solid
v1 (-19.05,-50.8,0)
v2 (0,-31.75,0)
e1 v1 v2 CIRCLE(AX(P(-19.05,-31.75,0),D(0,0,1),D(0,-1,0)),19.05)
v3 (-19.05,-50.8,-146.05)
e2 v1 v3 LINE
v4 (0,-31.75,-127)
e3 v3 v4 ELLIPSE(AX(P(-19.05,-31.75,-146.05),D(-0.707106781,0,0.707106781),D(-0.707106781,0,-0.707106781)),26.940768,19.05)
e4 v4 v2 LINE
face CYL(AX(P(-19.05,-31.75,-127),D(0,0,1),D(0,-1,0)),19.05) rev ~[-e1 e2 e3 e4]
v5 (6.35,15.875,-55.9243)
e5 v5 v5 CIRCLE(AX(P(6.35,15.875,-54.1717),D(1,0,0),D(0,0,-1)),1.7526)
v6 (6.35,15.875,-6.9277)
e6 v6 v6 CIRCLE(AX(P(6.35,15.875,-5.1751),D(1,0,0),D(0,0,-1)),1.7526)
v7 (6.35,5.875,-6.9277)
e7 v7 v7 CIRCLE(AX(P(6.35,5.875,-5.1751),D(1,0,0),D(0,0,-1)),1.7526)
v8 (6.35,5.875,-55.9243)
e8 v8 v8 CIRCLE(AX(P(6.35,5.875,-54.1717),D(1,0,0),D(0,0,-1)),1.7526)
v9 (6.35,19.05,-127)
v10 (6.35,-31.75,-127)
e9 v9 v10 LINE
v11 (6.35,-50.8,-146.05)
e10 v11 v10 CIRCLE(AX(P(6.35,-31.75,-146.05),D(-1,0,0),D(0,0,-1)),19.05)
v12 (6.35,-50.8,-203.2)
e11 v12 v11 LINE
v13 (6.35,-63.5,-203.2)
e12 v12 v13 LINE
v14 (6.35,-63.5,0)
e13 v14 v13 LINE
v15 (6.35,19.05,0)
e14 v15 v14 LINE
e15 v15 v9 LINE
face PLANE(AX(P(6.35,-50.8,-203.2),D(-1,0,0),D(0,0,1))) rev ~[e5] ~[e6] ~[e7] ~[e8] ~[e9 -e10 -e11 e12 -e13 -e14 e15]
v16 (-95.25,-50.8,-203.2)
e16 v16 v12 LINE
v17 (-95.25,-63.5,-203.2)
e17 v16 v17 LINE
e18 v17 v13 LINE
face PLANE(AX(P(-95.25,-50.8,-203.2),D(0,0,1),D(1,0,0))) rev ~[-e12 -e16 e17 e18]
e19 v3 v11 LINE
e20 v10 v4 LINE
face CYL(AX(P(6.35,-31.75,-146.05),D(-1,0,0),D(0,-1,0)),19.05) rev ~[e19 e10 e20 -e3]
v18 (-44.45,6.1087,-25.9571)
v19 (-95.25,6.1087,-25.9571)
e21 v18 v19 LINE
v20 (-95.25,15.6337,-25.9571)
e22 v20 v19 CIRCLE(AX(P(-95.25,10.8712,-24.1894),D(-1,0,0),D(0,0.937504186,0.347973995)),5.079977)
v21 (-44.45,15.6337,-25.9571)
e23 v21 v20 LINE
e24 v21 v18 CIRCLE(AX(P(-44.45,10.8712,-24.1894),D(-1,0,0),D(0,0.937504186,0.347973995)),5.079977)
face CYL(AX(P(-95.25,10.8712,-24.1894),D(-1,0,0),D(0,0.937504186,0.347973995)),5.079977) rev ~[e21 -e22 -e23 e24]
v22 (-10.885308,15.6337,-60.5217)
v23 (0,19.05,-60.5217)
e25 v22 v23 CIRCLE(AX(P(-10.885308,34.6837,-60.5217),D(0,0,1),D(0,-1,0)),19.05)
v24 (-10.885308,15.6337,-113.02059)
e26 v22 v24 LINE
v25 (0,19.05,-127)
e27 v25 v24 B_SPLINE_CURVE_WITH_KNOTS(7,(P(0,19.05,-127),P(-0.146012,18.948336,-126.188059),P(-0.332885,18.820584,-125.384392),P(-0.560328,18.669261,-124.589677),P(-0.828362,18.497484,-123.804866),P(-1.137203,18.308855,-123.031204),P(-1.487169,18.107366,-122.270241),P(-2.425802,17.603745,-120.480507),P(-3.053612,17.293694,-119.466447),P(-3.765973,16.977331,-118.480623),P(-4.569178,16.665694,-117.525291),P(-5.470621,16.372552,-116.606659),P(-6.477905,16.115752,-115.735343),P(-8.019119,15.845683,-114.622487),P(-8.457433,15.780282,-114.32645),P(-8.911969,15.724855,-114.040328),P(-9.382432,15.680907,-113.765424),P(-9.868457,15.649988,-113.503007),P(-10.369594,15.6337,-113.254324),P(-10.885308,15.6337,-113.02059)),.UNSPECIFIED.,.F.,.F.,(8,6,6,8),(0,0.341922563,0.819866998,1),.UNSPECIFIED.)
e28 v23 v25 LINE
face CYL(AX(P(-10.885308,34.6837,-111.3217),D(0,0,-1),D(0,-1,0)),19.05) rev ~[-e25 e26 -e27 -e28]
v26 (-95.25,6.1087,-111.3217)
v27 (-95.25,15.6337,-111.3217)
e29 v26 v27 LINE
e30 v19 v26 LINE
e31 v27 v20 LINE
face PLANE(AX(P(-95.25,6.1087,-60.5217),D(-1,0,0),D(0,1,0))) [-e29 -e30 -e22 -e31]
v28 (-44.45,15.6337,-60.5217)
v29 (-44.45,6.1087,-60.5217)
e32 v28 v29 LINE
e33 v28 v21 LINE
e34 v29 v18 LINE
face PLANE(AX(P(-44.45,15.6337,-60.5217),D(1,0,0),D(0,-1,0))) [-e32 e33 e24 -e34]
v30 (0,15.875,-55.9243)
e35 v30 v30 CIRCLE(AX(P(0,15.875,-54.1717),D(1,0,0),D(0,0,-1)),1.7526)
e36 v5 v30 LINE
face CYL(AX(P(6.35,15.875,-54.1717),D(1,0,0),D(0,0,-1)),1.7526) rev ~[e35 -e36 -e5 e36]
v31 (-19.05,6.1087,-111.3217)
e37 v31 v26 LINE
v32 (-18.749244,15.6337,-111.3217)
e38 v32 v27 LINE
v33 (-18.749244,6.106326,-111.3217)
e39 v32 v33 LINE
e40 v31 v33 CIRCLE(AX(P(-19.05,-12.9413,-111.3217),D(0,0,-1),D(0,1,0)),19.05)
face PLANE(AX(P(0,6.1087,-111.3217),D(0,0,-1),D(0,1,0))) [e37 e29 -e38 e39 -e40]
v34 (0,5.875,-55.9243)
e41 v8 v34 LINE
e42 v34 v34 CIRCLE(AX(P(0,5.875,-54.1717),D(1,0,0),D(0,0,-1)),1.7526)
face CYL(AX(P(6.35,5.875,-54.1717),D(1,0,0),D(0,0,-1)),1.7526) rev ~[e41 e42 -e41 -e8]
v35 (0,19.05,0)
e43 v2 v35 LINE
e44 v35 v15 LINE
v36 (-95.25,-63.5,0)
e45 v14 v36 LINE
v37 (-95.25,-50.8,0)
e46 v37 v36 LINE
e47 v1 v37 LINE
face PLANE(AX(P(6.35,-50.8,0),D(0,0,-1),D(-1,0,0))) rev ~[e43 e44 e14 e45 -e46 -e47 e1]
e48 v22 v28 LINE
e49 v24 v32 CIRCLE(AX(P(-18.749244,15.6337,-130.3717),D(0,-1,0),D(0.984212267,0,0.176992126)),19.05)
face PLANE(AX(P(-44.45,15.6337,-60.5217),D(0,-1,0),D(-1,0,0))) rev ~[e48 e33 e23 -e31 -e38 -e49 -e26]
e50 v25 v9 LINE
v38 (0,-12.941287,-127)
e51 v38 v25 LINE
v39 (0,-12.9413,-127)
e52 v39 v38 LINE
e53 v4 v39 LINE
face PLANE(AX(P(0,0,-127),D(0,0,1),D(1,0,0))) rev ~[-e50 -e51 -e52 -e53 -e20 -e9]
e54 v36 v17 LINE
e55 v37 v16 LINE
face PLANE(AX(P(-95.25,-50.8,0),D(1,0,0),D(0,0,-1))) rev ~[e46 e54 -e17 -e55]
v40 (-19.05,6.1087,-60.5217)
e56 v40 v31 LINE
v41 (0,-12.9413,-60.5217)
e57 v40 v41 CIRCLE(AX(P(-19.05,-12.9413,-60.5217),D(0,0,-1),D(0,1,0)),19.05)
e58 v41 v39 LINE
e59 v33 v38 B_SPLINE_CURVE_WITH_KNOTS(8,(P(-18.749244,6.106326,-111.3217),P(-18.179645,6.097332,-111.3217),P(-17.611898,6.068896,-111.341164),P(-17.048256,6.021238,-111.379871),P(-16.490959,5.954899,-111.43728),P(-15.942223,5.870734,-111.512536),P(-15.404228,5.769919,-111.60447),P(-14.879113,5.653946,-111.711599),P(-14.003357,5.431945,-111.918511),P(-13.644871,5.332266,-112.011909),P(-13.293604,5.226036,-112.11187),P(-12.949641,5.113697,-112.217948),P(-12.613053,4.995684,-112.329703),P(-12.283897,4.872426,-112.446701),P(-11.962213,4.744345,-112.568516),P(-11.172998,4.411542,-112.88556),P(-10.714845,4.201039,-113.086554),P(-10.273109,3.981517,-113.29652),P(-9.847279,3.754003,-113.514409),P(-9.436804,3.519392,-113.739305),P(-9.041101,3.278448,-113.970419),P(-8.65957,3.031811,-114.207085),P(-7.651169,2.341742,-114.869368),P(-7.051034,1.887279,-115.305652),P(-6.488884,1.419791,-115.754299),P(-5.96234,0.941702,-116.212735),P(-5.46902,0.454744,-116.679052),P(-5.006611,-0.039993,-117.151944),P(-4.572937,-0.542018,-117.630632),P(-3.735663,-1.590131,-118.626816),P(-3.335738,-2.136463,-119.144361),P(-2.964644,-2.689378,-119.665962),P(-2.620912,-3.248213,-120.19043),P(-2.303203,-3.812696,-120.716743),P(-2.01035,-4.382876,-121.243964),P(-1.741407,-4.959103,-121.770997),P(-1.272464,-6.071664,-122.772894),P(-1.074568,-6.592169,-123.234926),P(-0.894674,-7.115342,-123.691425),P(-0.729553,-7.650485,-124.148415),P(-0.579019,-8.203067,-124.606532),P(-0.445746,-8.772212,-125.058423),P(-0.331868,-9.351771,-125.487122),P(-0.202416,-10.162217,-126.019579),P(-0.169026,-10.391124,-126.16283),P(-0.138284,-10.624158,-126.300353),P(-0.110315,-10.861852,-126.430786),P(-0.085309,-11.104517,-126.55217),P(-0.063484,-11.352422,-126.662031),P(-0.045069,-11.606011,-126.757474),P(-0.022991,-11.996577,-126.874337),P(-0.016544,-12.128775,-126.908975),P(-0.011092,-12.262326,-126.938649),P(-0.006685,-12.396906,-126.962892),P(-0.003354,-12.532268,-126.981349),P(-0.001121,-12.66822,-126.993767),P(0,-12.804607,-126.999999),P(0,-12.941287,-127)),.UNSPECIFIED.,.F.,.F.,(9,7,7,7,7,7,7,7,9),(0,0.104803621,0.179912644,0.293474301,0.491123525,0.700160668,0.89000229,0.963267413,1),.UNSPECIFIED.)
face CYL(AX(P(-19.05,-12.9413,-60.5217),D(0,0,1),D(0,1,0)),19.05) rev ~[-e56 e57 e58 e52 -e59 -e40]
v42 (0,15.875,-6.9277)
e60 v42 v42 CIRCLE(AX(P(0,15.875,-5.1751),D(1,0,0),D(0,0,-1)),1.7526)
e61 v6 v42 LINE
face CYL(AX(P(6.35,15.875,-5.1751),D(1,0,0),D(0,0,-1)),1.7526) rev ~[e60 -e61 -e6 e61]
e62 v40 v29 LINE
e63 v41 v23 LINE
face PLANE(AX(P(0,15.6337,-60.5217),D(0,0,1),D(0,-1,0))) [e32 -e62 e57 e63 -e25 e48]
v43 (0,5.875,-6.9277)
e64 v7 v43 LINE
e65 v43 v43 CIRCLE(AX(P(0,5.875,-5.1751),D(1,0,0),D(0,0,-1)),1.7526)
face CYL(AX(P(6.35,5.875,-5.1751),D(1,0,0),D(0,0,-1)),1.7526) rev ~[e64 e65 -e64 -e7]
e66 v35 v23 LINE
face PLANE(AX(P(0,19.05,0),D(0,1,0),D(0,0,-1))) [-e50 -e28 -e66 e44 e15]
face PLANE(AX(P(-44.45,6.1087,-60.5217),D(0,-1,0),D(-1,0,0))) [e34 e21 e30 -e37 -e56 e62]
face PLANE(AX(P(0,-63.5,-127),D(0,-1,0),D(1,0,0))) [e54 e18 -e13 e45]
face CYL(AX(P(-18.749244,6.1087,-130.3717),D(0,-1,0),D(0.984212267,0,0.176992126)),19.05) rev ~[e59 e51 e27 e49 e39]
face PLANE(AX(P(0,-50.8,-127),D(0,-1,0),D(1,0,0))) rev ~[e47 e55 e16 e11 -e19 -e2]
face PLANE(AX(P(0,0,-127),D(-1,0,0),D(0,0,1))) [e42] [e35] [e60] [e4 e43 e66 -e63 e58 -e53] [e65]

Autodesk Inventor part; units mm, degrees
ref_plane "YZ Plane" through (0, 0, 0) normal (1, 0, 0) x (0, 1, 0)
ref_plane "XZ Plane" through (0, 0, 0) normal (0, 1, 0) x (-1, 0, 0)
ref_plane "XY Plane" through (0, 0, 0) normal (0, 0, 1) x (1, 0, 0)
sketch "Sketch1" plane through (0, 0, 0) normal (1, 0, 0) x (0, 1, 0)
  line L0 (0, 0) -> (19.05, 0)
  line L1 (19.05, 0) -> (19.05, -127)
  line L2 (19.05, -127) -> (0, -127)
  line L3 (0, -127) -> (0, 0)
  dimension "d0" = 19.05
  dimension "d1" = 127
extrude "Extrusion1" add sketch "Sketch1" along normal blind 6.35
sketch "Sketch2" plane through (6.35, 0, 0) normal (1, 0, 0) x (0, 0, -1)
  circle A0 centre (5.1751, 15.875) radius 1.7526
  circle A1 centre (5.1751, 5.875) radius 1.7526
  line L0 (127, 19.05) -> (0, 19.05) projected
  circle A2 centre (54.1717, 15.875) radius 1.7526
  circle A3 centre (54.1717, 5.875) radius 1.7526
  point P0 (0, 0)
  dimension "d4" = 3.5052
  dimension "d5" = 3.5052
  dimension "d6" = 10
  dimension "d7" = 3.175
  dimension "d11" = 3.5052
  dimension "d12" = 48.9966
  dimension "d13" = 3.5052
extrude "Extrusion2" cut sketch "Sketch2" against normal through all
sketch "Sketch3" plane through (0, 0, -127) normal (0, -1, 0) x (1, 0, 0)
  line L0 (6.35, 0) -> (6.35, 127) projected
  line L1 (0, 0) -> (0, 127) projected
  line L2 (6.35, 127) -> (0, 127)
  line L3 (0, 127) -> (0, 0)
  line L4 (0, 0) -> (6.35, 0)
  line L5 (6.35, 0) -> (6.35, 127)
  point P0 (0, 127)
extrude "Extrusion3" add sketch "Sketch3" along normal blind 50.8
sketch "Sketch4" plane through (0, -50.8, -127) normal (0, -1, 0) x (1, 0, 0)
  line L0 (6.35, 0) -> (6.35, 127) projected
  line L1 (6.35, 127) -> (-95.25, 127)
  line L2 (-95.25, 127) -> (-95.25, -76.2)
  line L3 (-95.25, -76.2) -> (6.35, -76.2)
  line L4 (6.35, -76.2) -> (6.35, 127)
  point P0 (0, 127)
  point P1 (6.35, 0)
  dimension "d16" = 203.2
  dimension "d17" = 101.6
extrude "Extrusion4" add sketch "Sketch4" along normal blind 12.7
fillet "Fillet1" radius 19.05 1 edges at (0, -50.8, -63.5)
fillet "Fillet2" radius 19.05 2 edges at (-9.525, -50.8, -127) (3.175, -50.8, -127)
sketch "Sketch5" plane through (0, 0, 0) normal (-1, 0, 0) x (0, 0, 1)
  line L0 (-111.3217, 15.6337) -> (-60.5217, 15.6337)
  line L1 (-60.5217, 15.6337) -> (-60.5217, 6.1087)
  line L2 (-60.5217, 6.1087) -> (-111.3217, 6.1087)
  line L3 (-111.3217, 6.1087) -> (-111.3217, 15.6337)
  circle A0 centre (-54.1717, 5.875) radius 1.7526 projected
  circle A1 centre (-54.1717, 15.875) radius 1.7526 projected
  point P0 (0, 0)
  point P1 (-60.5217, 10.8712)
  dimension "d22" = 9.525
  dimension "d23" = 50.8
  dimension "d26" = 5.0038
  dimension "d27" = 6.35
extrude "Extrusion5" add sketch "Sketch5" along normal blind 95.25 contours L0 L1 L2 L3
sketch "Sketch6" plane through (0, 6.1087, -60.5217) normal (0, 0, 1) x (1, 0, 0)
  line L0 (0, 9.525) -> (-95.25, 9.525) projected
  line L1 (0, 0) -> (-95.25, 0) projected
  line L2 (-95.25, 9.525) -> (-44.45, 9.525)
  line L3 (-44.45, 9.525) -> (-44.45, 0)
  line L4 (-44.45, 0) -> (-95.25, 0)
  line L5 (-95.25, 0) -> (-95.25, 9.525)
  point P0 (0, -6.1087)
  dimension "d30" = 50.8
extrude "Extrusion6" add sketch "Sketch6" along normal blind 38.1
sketch "Sketch7" plane through (-95.25, 0, 0) normal (-1, 0, 0) x (0, 0, 1)
  line L0 (-22.4217, 15.6337) -> (-22.4217, 6.1087) projected
  arc A0 (-22.4217, 15.6337) -> (-22.4217, 6.1087) centre (-24.1894, 10.8712) ccw
  line L1 (-22.4217, 15.6337) -> (-22.4217, 6.1087)
  point P0 (0, 0)
  dimension "d33" = 5.08
extrude "Extrusion7" cut sketch "Sketch7" against normal up to surface (50.8 mm away)
fillet "Fillet3" radius 19.05 3 edges at (0, 6.1087, -85.9217) (0, 10.8712, -111.3217) (0, 15.6337, -85.9217)
properties part number "motor plate"
